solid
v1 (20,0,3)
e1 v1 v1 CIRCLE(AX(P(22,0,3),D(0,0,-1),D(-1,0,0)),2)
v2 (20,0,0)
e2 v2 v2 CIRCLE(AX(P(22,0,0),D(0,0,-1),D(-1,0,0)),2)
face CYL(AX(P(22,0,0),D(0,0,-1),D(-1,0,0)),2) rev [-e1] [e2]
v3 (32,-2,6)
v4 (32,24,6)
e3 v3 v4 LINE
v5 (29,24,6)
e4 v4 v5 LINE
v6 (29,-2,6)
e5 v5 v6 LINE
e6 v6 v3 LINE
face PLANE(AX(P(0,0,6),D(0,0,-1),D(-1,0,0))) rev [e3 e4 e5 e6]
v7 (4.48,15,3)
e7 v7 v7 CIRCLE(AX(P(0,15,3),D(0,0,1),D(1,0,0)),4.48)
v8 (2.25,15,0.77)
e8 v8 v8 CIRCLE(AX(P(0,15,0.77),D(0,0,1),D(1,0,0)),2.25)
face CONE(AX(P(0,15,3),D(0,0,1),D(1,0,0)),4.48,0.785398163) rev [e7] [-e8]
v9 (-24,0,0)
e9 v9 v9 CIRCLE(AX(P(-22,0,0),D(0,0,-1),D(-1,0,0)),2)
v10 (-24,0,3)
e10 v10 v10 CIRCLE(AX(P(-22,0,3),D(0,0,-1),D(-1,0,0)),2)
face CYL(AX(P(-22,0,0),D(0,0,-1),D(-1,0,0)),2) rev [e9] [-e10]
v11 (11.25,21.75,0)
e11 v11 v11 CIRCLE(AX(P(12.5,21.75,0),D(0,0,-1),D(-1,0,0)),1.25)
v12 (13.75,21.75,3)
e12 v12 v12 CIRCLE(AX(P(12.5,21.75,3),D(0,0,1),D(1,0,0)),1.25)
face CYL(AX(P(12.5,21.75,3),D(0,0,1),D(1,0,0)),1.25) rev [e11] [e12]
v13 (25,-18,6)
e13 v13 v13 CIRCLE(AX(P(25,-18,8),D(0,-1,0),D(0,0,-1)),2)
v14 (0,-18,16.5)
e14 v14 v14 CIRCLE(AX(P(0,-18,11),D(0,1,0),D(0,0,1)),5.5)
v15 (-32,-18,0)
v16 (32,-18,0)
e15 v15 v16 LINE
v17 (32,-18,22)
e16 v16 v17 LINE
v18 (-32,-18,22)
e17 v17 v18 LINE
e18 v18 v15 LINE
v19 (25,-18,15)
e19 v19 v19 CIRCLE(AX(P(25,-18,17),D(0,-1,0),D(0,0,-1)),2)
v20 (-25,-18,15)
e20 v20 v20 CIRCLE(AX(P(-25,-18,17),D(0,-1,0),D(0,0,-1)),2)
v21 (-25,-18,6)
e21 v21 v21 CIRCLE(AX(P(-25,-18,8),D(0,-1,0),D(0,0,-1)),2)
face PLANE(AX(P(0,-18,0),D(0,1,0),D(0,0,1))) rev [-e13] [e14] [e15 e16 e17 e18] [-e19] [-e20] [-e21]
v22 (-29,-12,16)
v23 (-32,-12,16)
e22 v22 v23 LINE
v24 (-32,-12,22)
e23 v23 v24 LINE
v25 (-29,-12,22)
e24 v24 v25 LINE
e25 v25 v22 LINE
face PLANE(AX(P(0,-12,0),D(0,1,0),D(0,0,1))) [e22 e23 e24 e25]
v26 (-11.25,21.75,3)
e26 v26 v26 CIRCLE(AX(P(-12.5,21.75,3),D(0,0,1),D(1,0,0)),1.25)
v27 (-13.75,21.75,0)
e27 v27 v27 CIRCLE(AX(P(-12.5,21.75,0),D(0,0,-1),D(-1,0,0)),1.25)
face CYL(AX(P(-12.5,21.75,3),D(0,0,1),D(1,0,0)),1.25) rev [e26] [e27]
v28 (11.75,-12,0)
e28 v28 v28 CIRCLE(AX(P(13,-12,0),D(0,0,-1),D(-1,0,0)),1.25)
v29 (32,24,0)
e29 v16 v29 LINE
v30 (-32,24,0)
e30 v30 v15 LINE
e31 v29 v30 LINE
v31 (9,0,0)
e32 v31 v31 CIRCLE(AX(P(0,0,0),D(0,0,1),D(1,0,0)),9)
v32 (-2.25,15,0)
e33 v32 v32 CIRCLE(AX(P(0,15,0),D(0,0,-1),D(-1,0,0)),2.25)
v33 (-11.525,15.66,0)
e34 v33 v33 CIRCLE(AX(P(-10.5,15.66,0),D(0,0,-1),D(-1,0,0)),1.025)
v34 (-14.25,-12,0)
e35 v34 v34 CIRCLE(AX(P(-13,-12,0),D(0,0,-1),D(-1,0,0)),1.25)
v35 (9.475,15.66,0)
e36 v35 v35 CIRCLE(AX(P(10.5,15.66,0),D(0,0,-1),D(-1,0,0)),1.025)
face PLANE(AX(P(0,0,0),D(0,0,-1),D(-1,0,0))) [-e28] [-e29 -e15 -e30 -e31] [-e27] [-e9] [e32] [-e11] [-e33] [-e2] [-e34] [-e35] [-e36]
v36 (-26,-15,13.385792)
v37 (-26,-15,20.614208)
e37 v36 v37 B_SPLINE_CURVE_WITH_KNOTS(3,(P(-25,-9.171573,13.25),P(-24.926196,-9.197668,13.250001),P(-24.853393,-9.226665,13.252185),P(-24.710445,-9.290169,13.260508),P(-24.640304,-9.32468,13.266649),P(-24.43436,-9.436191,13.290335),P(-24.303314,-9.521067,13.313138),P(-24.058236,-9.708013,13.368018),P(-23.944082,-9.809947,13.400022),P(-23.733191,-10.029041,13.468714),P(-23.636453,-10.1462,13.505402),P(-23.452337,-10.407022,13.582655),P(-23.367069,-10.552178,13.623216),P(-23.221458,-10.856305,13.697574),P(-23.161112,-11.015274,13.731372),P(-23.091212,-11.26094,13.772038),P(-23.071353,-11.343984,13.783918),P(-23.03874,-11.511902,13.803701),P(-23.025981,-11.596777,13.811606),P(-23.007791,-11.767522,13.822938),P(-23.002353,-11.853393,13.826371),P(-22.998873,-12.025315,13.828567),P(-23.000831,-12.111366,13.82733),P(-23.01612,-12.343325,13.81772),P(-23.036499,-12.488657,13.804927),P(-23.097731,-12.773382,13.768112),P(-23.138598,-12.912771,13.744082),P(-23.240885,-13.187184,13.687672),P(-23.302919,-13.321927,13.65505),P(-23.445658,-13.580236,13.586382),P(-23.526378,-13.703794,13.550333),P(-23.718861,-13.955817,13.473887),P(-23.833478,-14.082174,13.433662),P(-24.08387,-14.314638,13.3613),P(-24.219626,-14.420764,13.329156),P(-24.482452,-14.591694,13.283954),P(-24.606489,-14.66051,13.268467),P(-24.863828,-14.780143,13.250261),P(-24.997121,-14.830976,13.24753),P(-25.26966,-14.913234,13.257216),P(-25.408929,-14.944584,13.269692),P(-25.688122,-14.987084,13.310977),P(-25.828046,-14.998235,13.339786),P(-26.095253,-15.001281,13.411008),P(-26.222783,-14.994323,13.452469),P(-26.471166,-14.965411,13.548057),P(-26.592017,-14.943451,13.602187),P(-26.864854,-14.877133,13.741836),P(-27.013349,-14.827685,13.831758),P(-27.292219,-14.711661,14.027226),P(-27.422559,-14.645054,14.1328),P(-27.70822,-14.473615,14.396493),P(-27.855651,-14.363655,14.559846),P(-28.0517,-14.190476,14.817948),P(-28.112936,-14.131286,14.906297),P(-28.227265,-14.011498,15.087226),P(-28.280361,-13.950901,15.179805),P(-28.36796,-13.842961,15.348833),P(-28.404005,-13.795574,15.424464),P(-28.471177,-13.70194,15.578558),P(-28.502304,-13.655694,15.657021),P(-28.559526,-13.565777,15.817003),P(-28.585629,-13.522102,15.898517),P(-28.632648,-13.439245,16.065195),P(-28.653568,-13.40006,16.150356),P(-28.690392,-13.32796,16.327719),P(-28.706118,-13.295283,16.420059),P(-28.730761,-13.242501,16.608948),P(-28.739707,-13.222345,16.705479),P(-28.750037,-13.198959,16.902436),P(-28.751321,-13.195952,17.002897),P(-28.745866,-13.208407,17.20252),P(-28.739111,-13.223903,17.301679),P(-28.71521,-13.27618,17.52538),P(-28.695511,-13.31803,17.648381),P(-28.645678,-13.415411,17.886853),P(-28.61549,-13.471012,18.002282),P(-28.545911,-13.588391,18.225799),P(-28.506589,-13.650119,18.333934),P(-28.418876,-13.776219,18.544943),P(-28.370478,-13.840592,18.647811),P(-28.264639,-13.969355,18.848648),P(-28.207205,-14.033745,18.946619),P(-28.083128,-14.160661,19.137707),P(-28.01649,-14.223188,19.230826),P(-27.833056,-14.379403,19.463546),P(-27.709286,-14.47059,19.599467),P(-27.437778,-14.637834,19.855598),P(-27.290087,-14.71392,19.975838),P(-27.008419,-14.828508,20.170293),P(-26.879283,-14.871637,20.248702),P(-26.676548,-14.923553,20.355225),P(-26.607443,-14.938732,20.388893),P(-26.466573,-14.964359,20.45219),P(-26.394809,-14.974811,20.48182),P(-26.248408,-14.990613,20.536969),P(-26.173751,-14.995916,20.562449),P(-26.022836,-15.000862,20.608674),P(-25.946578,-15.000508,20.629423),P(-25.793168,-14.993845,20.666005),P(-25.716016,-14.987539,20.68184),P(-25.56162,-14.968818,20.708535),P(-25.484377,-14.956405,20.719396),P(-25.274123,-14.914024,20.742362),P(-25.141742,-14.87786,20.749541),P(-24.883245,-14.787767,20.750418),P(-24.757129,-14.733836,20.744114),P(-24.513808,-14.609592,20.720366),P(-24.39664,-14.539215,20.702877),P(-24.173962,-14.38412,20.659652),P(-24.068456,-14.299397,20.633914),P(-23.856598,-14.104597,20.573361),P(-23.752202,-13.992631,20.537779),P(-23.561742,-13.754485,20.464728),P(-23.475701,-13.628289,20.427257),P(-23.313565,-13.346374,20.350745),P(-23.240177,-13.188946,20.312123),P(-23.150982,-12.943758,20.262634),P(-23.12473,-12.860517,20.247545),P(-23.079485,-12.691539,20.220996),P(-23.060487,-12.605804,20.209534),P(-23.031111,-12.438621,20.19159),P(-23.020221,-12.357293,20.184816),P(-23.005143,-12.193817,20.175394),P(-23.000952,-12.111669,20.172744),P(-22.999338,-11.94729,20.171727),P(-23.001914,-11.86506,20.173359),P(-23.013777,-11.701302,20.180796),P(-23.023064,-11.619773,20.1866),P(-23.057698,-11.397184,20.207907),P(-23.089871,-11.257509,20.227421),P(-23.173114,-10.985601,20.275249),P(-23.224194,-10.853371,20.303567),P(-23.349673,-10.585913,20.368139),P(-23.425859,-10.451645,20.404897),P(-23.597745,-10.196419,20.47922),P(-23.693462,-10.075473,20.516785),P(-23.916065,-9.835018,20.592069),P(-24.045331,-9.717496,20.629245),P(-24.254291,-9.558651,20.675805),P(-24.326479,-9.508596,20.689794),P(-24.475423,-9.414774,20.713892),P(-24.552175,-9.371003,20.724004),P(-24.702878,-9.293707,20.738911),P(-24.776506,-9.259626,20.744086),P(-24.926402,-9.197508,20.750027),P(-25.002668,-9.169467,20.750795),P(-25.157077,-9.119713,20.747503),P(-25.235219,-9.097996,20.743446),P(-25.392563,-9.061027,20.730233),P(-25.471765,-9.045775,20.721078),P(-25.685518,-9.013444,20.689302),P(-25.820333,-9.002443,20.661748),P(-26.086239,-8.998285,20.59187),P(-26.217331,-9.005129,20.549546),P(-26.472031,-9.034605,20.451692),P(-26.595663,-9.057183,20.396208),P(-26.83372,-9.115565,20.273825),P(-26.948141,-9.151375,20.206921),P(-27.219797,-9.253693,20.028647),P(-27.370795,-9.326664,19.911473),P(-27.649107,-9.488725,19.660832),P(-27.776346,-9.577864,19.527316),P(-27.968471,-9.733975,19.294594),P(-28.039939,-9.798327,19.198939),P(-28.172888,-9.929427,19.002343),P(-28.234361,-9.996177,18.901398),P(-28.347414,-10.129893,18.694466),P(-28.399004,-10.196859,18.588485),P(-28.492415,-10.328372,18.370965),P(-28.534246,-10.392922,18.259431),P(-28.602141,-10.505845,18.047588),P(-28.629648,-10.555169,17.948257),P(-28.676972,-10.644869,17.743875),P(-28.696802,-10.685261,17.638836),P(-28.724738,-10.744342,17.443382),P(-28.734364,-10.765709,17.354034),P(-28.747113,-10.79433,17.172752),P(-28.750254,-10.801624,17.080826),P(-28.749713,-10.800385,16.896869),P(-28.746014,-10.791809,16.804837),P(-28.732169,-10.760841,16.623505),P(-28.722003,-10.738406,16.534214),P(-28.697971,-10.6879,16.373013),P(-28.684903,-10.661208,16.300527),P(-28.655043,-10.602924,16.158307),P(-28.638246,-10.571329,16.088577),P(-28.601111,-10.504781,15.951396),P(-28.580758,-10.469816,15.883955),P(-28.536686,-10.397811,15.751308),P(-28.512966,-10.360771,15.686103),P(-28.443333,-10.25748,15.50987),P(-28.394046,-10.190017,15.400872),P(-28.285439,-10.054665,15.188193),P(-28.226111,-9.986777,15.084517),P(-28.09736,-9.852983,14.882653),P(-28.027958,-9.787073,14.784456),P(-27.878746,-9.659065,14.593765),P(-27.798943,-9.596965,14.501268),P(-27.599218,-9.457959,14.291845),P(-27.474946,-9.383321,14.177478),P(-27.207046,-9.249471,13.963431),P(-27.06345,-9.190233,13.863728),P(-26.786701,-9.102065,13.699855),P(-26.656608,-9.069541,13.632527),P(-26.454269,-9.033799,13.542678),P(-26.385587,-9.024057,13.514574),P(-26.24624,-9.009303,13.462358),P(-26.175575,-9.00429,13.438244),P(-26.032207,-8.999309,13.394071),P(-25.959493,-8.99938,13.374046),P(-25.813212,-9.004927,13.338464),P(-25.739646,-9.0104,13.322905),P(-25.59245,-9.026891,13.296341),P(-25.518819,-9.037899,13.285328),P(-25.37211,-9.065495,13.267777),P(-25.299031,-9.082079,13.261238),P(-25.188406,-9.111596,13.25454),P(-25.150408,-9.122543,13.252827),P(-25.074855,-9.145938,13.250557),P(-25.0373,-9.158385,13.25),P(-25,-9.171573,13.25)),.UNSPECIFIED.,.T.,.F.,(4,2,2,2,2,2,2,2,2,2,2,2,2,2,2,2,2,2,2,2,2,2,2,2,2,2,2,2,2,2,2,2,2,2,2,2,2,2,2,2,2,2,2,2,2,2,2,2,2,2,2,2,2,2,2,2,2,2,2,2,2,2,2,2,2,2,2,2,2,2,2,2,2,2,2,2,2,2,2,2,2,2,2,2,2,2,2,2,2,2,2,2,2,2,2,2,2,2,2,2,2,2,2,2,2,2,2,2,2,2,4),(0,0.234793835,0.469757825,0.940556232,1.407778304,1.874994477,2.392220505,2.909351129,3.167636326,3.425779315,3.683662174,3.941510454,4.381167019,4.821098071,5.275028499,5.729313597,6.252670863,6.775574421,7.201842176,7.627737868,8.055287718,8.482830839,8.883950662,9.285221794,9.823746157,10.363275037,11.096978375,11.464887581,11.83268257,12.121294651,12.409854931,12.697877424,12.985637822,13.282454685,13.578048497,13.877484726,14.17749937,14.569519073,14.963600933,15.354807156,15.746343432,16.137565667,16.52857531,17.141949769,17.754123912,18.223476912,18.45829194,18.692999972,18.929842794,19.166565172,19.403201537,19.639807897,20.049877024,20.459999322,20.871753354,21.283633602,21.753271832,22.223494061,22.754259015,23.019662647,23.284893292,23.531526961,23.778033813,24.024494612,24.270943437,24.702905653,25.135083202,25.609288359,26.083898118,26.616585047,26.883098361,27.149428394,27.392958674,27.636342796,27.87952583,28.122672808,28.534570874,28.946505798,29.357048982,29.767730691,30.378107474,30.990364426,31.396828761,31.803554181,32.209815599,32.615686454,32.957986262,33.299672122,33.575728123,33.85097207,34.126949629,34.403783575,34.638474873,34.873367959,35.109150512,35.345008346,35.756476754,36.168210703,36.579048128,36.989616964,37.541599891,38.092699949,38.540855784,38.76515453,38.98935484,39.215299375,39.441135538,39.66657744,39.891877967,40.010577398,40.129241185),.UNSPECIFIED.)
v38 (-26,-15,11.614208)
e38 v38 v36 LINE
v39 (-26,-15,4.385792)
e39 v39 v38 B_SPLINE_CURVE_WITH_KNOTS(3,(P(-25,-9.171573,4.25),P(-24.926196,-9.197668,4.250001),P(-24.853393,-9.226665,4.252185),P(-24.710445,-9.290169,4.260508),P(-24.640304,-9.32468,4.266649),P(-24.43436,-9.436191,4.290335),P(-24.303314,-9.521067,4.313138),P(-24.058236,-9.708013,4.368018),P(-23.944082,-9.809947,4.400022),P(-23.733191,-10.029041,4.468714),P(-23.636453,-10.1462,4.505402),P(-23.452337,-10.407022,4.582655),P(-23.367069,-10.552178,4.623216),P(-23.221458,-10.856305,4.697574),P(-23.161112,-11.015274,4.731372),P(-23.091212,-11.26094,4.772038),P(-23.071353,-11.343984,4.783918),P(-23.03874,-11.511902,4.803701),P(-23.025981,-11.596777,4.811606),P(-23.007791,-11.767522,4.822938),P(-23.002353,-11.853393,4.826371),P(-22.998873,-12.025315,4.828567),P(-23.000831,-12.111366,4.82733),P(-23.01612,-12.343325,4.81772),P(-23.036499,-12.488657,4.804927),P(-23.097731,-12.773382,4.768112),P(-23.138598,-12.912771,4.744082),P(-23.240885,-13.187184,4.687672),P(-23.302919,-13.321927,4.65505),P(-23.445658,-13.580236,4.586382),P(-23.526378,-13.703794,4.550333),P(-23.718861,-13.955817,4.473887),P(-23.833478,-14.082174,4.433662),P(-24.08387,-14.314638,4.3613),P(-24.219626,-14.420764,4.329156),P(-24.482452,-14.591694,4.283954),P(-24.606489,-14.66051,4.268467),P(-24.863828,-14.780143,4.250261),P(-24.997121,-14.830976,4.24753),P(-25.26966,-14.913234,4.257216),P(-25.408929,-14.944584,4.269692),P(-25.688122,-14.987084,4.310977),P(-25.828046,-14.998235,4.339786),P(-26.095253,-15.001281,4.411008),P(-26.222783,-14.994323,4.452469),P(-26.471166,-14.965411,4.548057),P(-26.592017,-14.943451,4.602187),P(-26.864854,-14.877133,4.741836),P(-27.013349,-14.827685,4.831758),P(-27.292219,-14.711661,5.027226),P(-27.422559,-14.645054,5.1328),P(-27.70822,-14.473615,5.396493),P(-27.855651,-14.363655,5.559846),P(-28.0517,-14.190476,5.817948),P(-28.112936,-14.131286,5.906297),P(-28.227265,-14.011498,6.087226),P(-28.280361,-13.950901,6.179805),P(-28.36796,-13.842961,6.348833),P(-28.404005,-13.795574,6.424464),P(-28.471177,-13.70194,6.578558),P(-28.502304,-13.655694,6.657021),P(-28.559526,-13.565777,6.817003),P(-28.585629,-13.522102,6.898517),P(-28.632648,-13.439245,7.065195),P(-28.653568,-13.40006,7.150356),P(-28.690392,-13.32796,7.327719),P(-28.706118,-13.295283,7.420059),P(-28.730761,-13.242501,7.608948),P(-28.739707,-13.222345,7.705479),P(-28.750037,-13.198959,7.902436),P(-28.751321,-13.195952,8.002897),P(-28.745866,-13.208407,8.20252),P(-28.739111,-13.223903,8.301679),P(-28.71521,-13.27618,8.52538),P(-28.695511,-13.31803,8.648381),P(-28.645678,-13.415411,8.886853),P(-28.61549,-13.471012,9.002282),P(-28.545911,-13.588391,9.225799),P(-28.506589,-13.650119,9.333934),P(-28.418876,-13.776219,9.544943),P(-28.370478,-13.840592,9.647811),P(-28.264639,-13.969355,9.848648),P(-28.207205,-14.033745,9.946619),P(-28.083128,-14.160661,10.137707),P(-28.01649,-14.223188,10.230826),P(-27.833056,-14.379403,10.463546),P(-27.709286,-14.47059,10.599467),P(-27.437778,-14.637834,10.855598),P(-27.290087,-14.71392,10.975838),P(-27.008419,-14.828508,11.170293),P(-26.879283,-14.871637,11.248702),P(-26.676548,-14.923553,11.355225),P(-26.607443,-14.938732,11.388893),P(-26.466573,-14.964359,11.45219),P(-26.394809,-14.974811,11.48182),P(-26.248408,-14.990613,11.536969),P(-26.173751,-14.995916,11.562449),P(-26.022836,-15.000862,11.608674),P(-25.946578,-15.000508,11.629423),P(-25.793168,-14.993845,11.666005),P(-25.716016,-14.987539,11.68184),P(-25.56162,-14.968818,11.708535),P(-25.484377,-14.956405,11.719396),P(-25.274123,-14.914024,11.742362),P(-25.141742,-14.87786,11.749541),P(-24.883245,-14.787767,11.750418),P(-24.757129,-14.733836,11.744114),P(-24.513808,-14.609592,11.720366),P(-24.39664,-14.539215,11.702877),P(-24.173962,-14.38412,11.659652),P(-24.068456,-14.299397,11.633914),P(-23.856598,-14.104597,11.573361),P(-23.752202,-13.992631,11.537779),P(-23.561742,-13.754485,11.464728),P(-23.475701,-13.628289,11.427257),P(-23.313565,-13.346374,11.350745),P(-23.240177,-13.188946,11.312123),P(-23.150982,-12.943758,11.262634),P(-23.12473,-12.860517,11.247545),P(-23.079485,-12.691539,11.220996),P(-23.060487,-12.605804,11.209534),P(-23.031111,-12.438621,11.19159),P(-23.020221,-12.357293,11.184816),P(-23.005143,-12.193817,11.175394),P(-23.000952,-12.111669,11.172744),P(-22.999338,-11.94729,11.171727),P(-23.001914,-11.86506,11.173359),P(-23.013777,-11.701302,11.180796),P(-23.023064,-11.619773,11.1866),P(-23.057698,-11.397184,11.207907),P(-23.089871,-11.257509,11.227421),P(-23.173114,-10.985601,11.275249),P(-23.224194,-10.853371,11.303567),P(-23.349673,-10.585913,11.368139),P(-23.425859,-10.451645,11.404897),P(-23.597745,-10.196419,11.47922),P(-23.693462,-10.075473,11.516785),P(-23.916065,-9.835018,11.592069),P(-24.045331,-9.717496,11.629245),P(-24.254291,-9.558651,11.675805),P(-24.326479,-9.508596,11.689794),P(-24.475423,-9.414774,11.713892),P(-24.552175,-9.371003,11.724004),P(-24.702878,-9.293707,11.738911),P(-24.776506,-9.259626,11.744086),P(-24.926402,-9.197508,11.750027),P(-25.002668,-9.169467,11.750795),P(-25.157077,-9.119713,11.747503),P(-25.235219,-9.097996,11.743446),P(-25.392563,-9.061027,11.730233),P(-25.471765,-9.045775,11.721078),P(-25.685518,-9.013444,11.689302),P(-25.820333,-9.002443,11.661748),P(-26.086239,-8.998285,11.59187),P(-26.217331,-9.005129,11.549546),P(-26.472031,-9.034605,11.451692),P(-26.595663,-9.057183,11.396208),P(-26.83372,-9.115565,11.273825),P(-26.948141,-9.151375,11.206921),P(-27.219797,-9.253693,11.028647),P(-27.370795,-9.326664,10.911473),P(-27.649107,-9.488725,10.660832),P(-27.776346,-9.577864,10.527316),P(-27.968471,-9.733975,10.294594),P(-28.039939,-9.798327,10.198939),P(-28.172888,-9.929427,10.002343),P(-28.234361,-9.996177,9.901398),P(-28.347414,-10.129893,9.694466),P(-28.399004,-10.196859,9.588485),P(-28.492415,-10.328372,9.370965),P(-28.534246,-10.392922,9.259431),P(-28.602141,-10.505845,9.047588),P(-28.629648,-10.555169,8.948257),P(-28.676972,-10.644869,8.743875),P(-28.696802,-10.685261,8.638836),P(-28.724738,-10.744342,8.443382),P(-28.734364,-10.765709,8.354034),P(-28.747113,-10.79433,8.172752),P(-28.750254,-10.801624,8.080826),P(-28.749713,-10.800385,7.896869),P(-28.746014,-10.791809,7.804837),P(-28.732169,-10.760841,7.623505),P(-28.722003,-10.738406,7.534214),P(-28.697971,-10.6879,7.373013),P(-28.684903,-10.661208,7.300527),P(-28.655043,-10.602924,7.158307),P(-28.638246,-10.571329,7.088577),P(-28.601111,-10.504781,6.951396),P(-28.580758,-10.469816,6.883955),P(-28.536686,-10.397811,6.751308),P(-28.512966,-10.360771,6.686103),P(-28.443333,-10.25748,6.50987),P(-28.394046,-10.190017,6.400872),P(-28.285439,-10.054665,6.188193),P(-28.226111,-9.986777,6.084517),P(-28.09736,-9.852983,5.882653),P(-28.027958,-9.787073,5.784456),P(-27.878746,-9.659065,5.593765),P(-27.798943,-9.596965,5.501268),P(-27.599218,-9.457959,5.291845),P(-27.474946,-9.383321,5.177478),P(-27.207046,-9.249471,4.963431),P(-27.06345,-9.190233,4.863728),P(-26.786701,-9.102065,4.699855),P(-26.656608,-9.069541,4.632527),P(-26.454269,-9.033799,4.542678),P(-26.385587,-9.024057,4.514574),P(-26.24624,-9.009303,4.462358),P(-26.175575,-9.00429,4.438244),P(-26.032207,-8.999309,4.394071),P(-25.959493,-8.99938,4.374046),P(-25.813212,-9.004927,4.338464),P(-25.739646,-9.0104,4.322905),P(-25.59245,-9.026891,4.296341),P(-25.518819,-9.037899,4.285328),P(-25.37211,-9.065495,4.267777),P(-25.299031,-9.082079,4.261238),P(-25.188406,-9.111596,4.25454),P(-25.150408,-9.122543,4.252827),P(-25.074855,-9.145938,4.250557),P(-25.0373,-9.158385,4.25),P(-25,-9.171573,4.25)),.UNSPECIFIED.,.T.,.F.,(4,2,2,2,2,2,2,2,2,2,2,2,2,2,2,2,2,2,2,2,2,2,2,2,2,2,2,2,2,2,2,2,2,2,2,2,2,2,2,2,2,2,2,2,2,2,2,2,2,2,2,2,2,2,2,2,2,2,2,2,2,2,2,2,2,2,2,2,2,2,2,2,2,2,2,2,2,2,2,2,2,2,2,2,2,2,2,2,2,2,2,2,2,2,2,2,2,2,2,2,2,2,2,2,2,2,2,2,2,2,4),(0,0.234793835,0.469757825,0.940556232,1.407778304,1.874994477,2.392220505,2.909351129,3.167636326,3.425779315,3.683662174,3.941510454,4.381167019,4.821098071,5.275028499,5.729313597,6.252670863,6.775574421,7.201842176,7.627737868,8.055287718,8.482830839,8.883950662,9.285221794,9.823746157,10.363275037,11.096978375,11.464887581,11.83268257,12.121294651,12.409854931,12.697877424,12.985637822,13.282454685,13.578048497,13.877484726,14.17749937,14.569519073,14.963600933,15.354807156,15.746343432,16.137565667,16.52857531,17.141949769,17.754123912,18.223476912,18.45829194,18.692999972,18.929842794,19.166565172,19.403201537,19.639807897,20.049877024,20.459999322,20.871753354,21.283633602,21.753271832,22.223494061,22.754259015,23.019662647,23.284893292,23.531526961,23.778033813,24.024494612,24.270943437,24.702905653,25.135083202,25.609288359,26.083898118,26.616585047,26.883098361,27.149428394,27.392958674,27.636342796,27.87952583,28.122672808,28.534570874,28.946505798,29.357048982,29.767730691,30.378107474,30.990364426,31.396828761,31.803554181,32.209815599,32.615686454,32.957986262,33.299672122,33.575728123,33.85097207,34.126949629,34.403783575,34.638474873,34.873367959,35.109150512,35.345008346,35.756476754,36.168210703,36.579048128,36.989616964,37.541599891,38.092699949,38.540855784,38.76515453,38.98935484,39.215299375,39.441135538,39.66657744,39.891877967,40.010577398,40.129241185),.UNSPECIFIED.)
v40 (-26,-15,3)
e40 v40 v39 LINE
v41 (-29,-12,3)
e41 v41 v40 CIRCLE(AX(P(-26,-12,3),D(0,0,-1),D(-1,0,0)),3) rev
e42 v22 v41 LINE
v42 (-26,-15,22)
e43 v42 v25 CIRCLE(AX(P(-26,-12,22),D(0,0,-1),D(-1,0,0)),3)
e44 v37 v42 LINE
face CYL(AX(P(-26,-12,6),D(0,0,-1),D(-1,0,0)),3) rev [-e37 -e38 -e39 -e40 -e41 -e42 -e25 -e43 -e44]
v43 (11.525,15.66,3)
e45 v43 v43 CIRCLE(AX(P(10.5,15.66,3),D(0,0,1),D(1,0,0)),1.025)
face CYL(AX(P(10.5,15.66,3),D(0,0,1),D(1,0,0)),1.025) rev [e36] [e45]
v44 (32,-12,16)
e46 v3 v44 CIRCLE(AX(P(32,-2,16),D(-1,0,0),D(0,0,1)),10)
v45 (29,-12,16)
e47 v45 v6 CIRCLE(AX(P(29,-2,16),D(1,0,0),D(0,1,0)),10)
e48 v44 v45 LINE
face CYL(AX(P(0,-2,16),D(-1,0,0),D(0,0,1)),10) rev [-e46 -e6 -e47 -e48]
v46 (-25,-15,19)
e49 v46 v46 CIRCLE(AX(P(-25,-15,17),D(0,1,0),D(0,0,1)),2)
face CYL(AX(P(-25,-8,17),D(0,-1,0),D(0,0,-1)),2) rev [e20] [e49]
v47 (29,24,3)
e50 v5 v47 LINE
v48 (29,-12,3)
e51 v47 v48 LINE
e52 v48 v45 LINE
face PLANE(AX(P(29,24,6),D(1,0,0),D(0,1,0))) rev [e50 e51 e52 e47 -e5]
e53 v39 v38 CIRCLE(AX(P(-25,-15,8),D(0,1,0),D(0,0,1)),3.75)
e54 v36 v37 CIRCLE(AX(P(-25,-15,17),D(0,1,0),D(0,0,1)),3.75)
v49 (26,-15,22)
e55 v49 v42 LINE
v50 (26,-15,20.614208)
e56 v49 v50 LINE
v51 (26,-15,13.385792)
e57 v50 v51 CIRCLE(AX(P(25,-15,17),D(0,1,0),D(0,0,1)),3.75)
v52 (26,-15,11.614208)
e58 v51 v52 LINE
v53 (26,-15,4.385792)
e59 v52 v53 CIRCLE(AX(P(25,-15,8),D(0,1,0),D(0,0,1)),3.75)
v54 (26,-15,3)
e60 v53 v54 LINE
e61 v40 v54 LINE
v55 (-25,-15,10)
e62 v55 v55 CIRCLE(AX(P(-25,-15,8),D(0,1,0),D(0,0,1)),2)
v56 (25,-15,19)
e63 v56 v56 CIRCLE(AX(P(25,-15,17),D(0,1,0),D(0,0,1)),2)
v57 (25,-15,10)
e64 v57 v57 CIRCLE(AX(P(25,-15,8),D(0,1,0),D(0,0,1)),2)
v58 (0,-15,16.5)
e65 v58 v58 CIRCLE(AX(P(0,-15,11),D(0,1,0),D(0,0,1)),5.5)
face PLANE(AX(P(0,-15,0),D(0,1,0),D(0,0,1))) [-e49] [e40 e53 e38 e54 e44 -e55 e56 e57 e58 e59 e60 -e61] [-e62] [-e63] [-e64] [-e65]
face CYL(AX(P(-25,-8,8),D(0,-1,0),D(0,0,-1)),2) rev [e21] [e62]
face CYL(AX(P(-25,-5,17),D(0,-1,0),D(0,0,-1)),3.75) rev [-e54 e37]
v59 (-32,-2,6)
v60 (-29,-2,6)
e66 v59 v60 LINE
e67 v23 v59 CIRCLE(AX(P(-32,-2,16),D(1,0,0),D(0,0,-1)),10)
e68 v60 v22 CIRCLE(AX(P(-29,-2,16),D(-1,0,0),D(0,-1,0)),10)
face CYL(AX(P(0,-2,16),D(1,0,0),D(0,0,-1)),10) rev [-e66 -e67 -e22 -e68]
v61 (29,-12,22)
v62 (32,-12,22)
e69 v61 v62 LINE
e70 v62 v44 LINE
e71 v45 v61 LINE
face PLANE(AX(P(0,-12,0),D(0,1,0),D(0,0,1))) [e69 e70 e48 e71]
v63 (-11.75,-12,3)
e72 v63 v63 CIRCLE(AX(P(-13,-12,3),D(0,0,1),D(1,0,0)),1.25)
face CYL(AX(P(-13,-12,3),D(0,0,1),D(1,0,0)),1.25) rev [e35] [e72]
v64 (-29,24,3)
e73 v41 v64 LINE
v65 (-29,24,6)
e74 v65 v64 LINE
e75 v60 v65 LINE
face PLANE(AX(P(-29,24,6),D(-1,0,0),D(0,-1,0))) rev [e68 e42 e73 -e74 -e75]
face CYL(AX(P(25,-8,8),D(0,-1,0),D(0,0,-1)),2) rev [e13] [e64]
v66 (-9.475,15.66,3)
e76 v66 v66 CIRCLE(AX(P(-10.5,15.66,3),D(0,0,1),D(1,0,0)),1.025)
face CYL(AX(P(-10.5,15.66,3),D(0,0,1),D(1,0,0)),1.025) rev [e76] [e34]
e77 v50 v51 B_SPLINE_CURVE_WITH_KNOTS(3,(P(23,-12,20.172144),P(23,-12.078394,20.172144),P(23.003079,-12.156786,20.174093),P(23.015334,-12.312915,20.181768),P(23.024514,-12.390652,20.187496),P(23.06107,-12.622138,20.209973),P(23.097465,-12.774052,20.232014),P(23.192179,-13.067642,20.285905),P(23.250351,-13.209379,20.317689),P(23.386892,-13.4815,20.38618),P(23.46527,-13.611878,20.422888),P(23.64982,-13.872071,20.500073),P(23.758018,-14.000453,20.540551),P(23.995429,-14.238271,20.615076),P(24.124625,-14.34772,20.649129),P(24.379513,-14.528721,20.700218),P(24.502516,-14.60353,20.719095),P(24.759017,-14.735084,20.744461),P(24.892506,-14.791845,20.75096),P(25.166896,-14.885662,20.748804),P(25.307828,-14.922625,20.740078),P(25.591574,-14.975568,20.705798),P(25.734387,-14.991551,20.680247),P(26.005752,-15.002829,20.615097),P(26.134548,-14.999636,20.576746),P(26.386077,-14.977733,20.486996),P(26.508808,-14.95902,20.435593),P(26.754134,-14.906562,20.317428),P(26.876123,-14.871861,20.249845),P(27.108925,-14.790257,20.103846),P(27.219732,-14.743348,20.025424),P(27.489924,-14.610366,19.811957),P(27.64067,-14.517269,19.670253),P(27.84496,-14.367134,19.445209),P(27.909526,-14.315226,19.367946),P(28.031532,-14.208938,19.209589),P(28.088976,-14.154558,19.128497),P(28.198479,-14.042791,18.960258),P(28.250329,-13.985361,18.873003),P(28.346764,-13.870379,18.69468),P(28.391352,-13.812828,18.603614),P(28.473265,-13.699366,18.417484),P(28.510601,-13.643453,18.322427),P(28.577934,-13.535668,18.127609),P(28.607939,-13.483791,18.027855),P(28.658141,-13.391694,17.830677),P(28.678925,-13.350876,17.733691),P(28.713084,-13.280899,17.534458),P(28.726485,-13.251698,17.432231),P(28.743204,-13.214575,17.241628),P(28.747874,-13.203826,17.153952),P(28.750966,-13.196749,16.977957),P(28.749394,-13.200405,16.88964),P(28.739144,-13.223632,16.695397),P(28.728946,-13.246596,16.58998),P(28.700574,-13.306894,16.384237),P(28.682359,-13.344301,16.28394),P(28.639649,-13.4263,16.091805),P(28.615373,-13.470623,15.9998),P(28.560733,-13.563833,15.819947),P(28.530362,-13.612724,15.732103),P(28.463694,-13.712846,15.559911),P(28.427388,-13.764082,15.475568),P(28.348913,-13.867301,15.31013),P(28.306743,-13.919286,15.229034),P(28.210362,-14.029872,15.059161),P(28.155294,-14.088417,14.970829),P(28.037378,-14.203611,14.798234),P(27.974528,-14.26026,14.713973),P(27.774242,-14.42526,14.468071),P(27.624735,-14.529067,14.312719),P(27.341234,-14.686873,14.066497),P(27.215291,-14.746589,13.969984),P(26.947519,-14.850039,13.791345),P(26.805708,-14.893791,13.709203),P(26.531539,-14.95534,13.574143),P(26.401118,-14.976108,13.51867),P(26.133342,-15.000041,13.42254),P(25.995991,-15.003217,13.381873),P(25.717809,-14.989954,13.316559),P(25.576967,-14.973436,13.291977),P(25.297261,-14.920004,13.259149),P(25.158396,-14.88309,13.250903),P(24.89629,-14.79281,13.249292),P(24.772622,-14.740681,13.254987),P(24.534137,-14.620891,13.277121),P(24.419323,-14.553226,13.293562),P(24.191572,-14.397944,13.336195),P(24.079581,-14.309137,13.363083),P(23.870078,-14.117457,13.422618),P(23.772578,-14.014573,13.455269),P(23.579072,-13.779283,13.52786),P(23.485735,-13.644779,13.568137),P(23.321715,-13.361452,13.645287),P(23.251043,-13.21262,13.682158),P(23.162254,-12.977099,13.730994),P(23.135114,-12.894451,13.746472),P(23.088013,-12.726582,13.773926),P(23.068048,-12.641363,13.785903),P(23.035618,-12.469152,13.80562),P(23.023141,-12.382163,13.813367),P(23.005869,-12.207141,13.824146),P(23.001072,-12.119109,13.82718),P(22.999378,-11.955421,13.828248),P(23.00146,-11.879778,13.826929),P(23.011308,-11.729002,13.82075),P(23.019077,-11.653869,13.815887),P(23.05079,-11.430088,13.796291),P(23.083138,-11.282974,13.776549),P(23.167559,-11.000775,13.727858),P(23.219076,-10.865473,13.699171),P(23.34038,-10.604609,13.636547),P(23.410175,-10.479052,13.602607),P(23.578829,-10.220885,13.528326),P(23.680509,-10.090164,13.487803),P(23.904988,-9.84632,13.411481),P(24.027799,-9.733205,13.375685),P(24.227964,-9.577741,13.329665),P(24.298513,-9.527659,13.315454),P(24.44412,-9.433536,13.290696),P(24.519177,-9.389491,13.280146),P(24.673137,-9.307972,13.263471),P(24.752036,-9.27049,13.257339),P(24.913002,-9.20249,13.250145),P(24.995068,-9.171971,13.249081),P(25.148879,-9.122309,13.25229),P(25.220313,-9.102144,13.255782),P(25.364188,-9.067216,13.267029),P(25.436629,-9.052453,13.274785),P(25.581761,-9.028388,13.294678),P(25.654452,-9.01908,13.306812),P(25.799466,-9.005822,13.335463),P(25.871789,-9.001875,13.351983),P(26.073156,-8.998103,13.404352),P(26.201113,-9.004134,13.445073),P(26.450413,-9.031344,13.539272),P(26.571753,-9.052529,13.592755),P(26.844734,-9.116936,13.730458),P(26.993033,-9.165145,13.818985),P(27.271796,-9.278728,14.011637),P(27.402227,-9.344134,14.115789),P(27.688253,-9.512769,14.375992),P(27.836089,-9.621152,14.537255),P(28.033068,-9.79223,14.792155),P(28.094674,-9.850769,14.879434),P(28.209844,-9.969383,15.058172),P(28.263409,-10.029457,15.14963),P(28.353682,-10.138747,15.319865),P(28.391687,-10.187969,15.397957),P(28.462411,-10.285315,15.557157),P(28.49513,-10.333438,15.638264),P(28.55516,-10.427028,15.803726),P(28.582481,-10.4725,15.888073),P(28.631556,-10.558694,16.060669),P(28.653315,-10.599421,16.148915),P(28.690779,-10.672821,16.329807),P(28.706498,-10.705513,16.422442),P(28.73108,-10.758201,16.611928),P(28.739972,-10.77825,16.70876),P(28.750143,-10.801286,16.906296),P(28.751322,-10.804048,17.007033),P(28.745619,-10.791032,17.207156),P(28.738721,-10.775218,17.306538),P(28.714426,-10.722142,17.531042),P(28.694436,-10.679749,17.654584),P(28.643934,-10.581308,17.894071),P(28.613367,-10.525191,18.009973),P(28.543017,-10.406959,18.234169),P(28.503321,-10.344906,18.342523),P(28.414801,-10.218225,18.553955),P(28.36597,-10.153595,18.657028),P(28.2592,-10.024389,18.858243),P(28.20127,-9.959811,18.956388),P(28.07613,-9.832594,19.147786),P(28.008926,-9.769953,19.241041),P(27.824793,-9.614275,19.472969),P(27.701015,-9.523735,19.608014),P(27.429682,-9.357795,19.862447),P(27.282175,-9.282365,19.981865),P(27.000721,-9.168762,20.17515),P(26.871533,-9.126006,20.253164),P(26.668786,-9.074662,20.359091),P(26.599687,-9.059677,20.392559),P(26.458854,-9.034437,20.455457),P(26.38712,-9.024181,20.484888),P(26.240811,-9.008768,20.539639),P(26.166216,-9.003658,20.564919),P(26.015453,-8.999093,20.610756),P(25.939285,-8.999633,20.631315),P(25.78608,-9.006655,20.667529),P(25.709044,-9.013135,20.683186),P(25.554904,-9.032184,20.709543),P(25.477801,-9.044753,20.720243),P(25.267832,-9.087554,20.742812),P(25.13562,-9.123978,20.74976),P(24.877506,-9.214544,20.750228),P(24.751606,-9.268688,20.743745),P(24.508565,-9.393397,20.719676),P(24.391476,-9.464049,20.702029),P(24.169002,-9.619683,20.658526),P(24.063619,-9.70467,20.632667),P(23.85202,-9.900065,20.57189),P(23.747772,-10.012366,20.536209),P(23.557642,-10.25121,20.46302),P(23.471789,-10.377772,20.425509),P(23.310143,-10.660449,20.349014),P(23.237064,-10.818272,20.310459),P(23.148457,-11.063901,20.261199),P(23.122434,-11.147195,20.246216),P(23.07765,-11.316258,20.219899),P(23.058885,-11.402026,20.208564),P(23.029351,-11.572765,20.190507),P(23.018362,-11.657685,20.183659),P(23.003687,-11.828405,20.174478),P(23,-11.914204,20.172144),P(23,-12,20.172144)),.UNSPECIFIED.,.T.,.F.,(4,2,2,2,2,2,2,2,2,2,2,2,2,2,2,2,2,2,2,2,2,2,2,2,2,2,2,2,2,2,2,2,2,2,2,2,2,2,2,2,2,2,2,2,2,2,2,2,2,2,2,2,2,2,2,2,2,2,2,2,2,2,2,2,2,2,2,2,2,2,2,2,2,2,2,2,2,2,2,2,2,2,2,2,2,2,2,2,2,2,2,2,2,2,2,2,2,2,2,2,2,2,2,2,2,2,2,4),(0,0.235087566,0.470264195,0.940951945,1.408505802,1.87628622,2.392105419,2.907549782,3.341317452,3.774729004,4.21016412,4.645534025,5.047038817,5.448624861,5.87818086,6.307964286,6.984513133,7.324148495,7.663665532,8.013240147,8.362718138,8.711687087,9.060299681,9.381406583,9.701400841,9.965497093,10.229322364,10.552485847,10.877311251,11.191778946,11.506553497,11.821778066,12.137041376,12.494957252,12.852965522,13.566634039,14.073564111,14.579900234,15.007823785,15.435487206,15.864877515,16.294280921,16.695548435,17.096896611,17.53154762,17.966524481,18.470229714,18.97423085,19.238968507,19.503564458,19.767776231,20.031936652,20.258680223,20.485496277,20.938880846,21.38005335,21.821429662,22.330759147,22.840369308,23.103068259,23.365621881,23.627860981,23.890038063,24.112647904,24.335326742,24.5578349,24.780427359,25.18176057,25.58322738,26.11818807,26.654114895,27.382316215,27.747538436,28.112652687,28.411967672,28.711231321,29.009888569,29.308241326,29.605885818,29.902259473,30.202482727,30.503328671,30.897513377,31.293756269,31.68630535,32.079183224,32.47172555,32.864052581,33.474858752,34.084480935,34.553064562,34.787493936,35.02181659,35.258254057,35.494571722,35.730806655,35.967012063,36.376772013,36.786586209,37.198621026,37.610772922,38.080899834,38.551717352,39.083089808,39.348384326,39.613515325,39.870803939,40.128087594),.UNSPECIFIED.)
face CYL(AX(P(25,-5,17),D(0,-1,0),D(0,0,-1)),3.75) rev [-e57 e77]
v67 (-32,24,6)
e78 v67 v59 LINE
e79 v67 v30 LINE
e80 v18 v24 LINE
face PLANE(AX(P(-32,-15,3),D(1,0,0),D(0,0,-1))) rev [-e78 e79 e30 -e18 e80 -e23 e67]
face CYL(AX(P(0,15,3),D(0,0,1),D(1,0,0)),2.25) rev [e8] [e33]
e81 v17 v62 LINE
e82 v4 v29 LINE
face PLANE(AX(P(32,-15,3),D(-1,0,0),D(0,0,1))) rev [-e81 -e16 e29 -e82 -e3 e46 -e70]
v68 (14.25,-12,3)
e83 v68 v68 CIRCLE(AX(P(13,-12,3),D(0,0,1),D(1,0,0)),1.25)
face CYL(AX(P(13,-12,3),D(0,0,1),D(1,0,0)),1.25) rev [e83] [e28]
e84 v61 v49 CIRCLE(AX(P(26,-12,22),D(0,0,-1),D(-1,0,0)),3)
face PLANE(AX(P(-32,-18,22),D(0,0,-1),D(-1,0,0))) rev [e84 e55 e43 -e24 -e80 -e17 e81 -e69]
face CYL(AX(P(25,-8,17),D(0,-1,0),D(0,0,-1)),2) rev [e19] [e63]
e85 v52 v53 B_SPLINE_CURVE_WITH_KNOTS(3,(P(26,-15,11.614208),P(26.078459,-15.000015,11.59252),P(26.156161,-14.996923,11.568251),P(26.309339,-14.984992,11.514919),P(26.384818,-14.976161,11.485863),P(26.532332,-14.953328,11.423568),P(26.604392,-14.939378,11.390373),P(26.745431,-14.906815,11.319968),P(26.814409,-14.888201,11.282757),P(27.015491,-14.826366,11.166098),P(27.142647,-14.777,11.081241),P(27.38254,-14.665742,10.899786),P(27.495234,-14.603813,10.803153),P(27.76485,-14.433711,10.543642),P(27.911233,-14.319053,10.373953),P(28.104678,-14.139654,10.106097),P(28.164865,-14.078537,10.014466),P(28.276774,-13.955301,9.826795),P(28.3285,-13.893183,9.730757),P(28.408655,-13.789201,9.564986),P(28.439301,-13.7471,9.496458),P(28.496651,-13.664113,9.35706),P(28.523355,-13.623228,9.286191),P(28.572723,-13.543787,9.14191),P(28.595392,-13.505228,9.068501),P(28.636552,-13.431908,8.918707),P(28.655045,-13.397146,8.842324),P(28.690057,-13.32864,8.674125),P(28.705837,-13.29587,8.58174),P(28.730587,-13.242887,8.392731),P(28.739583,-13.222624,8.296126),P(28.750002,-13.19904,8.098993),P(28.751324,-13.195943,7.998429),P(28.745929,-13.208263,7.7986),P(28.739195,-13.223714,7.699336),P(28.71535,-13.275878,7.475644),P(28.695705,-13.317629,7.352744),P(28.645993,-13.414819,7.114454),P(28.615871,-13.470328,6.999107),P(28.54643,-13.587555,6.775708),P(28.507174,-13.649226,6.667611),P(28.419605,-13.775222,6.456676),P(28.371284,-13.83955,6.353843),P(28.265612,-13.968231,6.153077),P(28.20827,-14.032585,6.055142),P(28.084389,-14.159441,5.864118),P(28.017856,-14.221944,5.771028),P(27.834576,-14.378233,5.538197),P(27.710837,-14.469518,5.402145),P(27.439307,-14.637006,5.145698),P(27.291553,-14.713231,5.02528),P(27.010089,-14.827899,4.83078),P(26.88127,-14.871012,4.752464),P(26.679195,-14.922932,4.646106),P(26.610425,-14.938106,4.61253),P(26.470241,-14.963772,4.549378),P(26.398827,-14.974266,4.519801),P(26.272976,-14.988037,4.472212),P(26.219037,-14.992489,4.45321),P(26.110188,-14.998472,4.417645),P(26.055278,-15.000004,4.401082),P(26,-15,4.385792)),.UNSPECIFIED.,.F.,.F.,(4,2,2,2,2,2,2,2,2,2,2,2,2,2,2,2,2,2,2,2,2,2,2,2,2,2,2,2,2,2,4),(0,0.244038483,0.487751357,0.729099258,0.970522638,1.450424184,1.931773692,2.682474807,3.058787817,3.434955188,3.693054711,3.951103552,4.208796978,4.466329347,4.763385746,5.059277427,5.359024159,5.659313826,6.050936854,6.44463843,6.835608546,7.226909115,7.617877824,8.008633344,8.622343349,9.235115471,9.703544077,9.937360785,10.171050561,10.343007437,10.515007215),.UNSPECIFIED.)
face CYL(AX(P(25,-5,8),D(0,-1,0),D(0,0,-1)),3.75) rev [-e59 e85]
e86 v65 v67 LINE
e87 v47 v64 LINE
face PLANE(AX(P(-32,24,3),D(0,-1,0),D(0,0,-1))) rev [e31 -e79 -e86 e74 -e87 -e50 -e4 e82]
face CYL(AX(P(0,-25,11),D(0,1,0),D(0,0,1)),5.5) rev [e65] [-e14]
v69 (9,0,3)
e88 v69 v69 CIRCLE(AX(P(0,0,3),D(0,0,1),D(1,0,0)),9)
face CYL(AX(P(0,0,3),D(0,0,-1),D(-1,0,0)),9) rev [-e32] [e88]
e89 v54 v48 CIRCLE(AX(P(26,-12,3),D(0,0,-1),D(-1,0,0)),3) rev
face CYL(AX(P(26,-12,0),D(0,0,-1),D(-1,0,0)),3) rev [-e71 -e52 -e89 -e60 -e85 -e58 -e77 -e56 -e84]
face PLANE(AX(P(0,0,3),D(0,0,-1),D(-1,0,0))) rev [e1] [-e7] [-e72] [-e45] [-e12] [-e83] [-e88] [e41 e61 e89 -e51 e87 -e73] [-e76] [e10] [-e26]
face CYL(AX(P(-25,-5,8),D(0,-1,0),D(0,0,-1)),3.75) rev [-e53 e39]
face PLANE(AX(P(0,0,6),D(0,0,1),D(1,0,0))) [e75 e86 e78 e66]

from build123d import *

# Parameters (mm, degrees)
SKETCH1_W                                            = 64
SKETCH1_H                                            = 39
SKETCH1_R                                            = 9
BOSS_EXTRUDE1_DEPTH                                  = 3
SKETCH2_W                                            = 3
SKETCH2_H                                            = 39
BOSS_EXTRUDE2_DEPTH                                  = 3
SKETCH3_W                                            = 64
SKETCH3_H                                            = 22
BOSS_EXTRUDE3_DEPTH                                  = 3
SKETCH4_W                                            = 3
SKETCH4_H                                            = 16
BOSS_EXTRUDE4_DEPTH                                  = 3
FILLET1_R                                            = 10
F_4_0_4_DIAMETER_HOLE1_D                             = 4
F_4_0_4_DIAMETER_HOLE1_DEPTH                         = 15
F_4_0_4_DIAMETER_HOLE1_TIP                           = 1.201721238
CSK_FOR_M4_HEX_SOCKET_COUNTERSUNK_CAP_SC_D           = 4.5
CSK_FOR_M4_HEX_SOCKET_COUNTERSUNK_CAP_SC_DEPTH       = 10
CSK_FOR_M4_HEX_SOCKET_COUNTERSUNK_CAP_SC_CSINK_D     = 8.96
CSK_FOR_M4_HEX_SOCKET_COUNTERSUNK_CAP_SC_CSINK_ANGLE = 90
CSK_FOR_M4_HEX_SOCKET_COUNTERSUNK_CAP_SC_TIP         = 1.351936393
M2_5_TAPPED_HOLE1_D                                  = 2.05
M2_5_TAPPED_HOLE1_DEPTH                              = 7.25
M2_5_TAPPED_HOLE1_TIP                                = 0.615882135
M3_TAPPED_HOLE1_D                                    = 2.5
M3_TAPPED_HOLE1_DEPTH                                = 8.5
M3_TAPPED_HOLE1_TIP                                  = 0.751075774
FILLET4_R                                            = 3
SKETCH19_R                                           = 2
CUT_EXTRUDE1_DEPTH                                   = 10
SKETCH20_R                                           = 5.5
CUT_EXTRUDE2_DEPTH                                   = 10
SKETCH21_R                                           = 3.75
CUT_EXTRUDE3_DEPTH                                   = 10


with BuildPart() as part:
    # Sketch1 → Boss-Extrude1 (new body)
    with BuildSketch(Plane.XY):
        with Locations((0, 4.5)):
            Rectangle(SKETCH1_W, SKETCH1_H)
        Circle(SKETCH1_R, mode=Mode.SUBTRACT)
    extrude(amount=BOSS_EXTRUDE1_DEPTH)

    # Sketch2 → Boss-Extrude2 (add)
    with BuildSketch(Plane.XY.offset(3)):
        with Locations((-30.5, 4.5)):
            Rectangle(SKETCH2_W, SKETCH2_H)
        with Locations((30.5, 4.5)):
            Rectangle(SKETCH2_W, SKETCH2_H)
    extrude(amount=BOSS_EXTRUDE2_DEPTH)

    # Sketch3 → Boss-Extrude3 (add)
    with BuildSketch(Plane.XZ.offset(15)):
        with Locations((0, 11)):
            Rectangle(SKETCH3_W, SKETCH3_H)
    extrude(amount=BOSS_EXTRUDE3_DEPTH)

    # Sketch4 → Boss-Extrude4 (add)
    with BuildSketch(Plane(origin=(0, -15, 0), x_dir=(1, 0, 0), z_dir=(0, 1, 0))):
        with Locations((-30.5, -14)):
            Rectangle(SKETCH4_W, SKETCH4_H)
        with Locations((30.5, -14)):
            Rectangle(SKETCH4_W, SKETCH4_H)
    extrude(amount=BOSS_EXTRUDE4_DEPTH)

    # Fillet1
    fillet1_edges = [part.edges().sort_by_distance(p)[0] for p in [
        (-30.5, -12, 6),
        (30.5, -12, 6),
    ]]
    fillet(fillet1_edges, radius=FILLET1_R)

    # Ø4.0 (4) Diameter Hole1
    with Locations(Plane(origin=(0, 0, 0), x_dir=(-1, 0, 0), z_dir=(0, 0, -1))):
        with Locations((-22, 0), (22, 0)):
            Hole(F_4_0_4_DIAMETER_HOLE1_D / 2, depth=F_4_0_4_DIAMETER_HOLE1_DEPTH)
            with Locations((0, 0, -(F_4_0_4_DIAMETER_HOLE1_DEPTH + F_4_0_4_DIAMETER_HOLE1_TIP / 2))):  # 118° drill point
                Cone(0, F_4_0_4_DIAMETER_HOLE1_D / 2, F_4_0_4_DIAMETER_HOLE1_TIP, mode=Mode.SUBTRACT)

    # CSK for M4 Hex Socket Countersunk Cap Screw1
    with Locations(Plane.XY.offset(3)):
        with Locations((0, 15)):
            CounterSinkHole(CSK_FOR_M4_HEX_SOCKET_COUNTERSUNK_CAP_SC_D / 2, CSK_FOR_M4_HEX_SOCKET_COUNTERSUNK_CAP_SC_CSINK_D / 2, depth=CSK_FOR_M4_HEX_SOCKET_COUNTERSUNK_CAP_SC_DEPTH, counter_sink_angle=CSK_FOR_M4_HEX_SOCKET_COUNTERSUNK_CAP_SC_CSINK_ANGLE)
            with Locations((0, 0, -(CSK_FOR_M4_HEX_SOCKET_COUNTERSUNK_CAP_SC_DEPTH + CSK_FOR_M4_HEX_SOCKET_COUNTERSUNK_CAP_SC_TIP / 2))):  # 118° drill point
                Cone(0, CSK_FOR_M4_HEX_SOCKET_COUNTERSUNK_CAP_SC_D / 2, CSK_FOR_M4_HEX_SOCKET_COUNTERSUNK_CAP_SC_TIP, mode=Mode.SUBTRACT)

    # M2.5 Tapped Hole1
    with Locations(Plane.XY.offset(3)):
        with Locations((-10.5, 15.66), (10.5, 15.66)):
            Hole(M2_5_TAPPED_HOLE1_D / 2, depth=M2_5_TAPPED_HOLE1_DEPTH)
            with Locations((0, 0, -(M2_5_TAPPED_HOLE1_DEPTH + M2_5_TAPPED_HOLE1_TIP / 2))):  # 118° drill point
                Cone(0, M2_5_TAPPED_HOLE1_D / 2, M2_5_TAPPED_HOLE1_TIP, mode=Mode.SUBTRACT)

    # M3 Tapped Hole1
    with Locations(Plane.XY.offset(3)):
        with Locations((-12.5, 21.75), (12.5, 21.75), (13, -12), (-13, -12)):
            Hole(M3_TAPPED_HOLE1_D / 2, depth=M3_TAPPED_HOLE1_DEPTH)
            with Locations((0, 0, -(M3_TAPPED_HOLE1_DEPTH + M3_TAPPED_HOLE1_TIP / 2))):  # 118° drill point
                Cone(0, M3_TAPPED_HOLE1_D / 2, M3_TAPPED_HOLE1_TIP, mode=Mode.SUBTRACT)

    # Fillet4
    fillet4_edges = [part.edges().sort_by_distance(p)[0] for p in [
        (29, -15, 12.5),
        (-29, -15, 12.5),
    ]]
    fillet(fillet4_edges, radius=FILLET4_R - 0.0001)  # a hair under: the kernel refuses the full size

    # Sketch19 → Cut-Extrude1 (cut)
    with BuildSketch(Plane.XZ.offset(18)):
        with Locations(Location((-25, 8, 0), (0, 0, 270))):
            Circle(SKETCH19_R)
        with Locations(Location((25, 8, 0), (0, 0, 270))):
            Circle(SKETCH19_R)
        with Locations(Location((-25, 17, 0), (0, 0, 270))):
            Circle(SKETCH19_R)
        with Locations(Location((25, 17, 0), (0, 0, 270))):
            Circle(SKETCH19_R)
    extrude(amount=-CUT_EXTRUDE1_DEPTH, mode=Mode.SUBTRACT)

    # Sketch20 → Cut-Extrude2 (cut)
    with BuildSketch(Plane(origin=(0, -15, 0), x_dir=(1, 0, 0), z_dir=(0, 1, 0))):
        with Locations(Location((0, -11, 0), (0, 0, 270))):
            Circle(SKETCH20_R)
    extrude(amount=-CUT_EXTRUDE2_DEPTH, mode=Mode.SUBTRACT)

    # Sketch21 → Cut-Extrude3 (cut)
    with BuildSketch(Plane(origin=(0, -15, 0), x_dir=(1, 0, 0), z_dir=(0, 1, 0))):
        with Locations((-25, -8)):
            Circle(SKETCH21_R)
        with Locations((-25, -17)):
            Circle(SKETCH21_R)
        with Locations((25, -8)):
            Circle(SKETCH21_R)
        with Locations((25, -17)):
            Circle(SKETCH21_R)
    extrude(amount=CUT_EXTRUDE3_DEPTH, mode=Mode.SUBTRACT)


solid = part.part
